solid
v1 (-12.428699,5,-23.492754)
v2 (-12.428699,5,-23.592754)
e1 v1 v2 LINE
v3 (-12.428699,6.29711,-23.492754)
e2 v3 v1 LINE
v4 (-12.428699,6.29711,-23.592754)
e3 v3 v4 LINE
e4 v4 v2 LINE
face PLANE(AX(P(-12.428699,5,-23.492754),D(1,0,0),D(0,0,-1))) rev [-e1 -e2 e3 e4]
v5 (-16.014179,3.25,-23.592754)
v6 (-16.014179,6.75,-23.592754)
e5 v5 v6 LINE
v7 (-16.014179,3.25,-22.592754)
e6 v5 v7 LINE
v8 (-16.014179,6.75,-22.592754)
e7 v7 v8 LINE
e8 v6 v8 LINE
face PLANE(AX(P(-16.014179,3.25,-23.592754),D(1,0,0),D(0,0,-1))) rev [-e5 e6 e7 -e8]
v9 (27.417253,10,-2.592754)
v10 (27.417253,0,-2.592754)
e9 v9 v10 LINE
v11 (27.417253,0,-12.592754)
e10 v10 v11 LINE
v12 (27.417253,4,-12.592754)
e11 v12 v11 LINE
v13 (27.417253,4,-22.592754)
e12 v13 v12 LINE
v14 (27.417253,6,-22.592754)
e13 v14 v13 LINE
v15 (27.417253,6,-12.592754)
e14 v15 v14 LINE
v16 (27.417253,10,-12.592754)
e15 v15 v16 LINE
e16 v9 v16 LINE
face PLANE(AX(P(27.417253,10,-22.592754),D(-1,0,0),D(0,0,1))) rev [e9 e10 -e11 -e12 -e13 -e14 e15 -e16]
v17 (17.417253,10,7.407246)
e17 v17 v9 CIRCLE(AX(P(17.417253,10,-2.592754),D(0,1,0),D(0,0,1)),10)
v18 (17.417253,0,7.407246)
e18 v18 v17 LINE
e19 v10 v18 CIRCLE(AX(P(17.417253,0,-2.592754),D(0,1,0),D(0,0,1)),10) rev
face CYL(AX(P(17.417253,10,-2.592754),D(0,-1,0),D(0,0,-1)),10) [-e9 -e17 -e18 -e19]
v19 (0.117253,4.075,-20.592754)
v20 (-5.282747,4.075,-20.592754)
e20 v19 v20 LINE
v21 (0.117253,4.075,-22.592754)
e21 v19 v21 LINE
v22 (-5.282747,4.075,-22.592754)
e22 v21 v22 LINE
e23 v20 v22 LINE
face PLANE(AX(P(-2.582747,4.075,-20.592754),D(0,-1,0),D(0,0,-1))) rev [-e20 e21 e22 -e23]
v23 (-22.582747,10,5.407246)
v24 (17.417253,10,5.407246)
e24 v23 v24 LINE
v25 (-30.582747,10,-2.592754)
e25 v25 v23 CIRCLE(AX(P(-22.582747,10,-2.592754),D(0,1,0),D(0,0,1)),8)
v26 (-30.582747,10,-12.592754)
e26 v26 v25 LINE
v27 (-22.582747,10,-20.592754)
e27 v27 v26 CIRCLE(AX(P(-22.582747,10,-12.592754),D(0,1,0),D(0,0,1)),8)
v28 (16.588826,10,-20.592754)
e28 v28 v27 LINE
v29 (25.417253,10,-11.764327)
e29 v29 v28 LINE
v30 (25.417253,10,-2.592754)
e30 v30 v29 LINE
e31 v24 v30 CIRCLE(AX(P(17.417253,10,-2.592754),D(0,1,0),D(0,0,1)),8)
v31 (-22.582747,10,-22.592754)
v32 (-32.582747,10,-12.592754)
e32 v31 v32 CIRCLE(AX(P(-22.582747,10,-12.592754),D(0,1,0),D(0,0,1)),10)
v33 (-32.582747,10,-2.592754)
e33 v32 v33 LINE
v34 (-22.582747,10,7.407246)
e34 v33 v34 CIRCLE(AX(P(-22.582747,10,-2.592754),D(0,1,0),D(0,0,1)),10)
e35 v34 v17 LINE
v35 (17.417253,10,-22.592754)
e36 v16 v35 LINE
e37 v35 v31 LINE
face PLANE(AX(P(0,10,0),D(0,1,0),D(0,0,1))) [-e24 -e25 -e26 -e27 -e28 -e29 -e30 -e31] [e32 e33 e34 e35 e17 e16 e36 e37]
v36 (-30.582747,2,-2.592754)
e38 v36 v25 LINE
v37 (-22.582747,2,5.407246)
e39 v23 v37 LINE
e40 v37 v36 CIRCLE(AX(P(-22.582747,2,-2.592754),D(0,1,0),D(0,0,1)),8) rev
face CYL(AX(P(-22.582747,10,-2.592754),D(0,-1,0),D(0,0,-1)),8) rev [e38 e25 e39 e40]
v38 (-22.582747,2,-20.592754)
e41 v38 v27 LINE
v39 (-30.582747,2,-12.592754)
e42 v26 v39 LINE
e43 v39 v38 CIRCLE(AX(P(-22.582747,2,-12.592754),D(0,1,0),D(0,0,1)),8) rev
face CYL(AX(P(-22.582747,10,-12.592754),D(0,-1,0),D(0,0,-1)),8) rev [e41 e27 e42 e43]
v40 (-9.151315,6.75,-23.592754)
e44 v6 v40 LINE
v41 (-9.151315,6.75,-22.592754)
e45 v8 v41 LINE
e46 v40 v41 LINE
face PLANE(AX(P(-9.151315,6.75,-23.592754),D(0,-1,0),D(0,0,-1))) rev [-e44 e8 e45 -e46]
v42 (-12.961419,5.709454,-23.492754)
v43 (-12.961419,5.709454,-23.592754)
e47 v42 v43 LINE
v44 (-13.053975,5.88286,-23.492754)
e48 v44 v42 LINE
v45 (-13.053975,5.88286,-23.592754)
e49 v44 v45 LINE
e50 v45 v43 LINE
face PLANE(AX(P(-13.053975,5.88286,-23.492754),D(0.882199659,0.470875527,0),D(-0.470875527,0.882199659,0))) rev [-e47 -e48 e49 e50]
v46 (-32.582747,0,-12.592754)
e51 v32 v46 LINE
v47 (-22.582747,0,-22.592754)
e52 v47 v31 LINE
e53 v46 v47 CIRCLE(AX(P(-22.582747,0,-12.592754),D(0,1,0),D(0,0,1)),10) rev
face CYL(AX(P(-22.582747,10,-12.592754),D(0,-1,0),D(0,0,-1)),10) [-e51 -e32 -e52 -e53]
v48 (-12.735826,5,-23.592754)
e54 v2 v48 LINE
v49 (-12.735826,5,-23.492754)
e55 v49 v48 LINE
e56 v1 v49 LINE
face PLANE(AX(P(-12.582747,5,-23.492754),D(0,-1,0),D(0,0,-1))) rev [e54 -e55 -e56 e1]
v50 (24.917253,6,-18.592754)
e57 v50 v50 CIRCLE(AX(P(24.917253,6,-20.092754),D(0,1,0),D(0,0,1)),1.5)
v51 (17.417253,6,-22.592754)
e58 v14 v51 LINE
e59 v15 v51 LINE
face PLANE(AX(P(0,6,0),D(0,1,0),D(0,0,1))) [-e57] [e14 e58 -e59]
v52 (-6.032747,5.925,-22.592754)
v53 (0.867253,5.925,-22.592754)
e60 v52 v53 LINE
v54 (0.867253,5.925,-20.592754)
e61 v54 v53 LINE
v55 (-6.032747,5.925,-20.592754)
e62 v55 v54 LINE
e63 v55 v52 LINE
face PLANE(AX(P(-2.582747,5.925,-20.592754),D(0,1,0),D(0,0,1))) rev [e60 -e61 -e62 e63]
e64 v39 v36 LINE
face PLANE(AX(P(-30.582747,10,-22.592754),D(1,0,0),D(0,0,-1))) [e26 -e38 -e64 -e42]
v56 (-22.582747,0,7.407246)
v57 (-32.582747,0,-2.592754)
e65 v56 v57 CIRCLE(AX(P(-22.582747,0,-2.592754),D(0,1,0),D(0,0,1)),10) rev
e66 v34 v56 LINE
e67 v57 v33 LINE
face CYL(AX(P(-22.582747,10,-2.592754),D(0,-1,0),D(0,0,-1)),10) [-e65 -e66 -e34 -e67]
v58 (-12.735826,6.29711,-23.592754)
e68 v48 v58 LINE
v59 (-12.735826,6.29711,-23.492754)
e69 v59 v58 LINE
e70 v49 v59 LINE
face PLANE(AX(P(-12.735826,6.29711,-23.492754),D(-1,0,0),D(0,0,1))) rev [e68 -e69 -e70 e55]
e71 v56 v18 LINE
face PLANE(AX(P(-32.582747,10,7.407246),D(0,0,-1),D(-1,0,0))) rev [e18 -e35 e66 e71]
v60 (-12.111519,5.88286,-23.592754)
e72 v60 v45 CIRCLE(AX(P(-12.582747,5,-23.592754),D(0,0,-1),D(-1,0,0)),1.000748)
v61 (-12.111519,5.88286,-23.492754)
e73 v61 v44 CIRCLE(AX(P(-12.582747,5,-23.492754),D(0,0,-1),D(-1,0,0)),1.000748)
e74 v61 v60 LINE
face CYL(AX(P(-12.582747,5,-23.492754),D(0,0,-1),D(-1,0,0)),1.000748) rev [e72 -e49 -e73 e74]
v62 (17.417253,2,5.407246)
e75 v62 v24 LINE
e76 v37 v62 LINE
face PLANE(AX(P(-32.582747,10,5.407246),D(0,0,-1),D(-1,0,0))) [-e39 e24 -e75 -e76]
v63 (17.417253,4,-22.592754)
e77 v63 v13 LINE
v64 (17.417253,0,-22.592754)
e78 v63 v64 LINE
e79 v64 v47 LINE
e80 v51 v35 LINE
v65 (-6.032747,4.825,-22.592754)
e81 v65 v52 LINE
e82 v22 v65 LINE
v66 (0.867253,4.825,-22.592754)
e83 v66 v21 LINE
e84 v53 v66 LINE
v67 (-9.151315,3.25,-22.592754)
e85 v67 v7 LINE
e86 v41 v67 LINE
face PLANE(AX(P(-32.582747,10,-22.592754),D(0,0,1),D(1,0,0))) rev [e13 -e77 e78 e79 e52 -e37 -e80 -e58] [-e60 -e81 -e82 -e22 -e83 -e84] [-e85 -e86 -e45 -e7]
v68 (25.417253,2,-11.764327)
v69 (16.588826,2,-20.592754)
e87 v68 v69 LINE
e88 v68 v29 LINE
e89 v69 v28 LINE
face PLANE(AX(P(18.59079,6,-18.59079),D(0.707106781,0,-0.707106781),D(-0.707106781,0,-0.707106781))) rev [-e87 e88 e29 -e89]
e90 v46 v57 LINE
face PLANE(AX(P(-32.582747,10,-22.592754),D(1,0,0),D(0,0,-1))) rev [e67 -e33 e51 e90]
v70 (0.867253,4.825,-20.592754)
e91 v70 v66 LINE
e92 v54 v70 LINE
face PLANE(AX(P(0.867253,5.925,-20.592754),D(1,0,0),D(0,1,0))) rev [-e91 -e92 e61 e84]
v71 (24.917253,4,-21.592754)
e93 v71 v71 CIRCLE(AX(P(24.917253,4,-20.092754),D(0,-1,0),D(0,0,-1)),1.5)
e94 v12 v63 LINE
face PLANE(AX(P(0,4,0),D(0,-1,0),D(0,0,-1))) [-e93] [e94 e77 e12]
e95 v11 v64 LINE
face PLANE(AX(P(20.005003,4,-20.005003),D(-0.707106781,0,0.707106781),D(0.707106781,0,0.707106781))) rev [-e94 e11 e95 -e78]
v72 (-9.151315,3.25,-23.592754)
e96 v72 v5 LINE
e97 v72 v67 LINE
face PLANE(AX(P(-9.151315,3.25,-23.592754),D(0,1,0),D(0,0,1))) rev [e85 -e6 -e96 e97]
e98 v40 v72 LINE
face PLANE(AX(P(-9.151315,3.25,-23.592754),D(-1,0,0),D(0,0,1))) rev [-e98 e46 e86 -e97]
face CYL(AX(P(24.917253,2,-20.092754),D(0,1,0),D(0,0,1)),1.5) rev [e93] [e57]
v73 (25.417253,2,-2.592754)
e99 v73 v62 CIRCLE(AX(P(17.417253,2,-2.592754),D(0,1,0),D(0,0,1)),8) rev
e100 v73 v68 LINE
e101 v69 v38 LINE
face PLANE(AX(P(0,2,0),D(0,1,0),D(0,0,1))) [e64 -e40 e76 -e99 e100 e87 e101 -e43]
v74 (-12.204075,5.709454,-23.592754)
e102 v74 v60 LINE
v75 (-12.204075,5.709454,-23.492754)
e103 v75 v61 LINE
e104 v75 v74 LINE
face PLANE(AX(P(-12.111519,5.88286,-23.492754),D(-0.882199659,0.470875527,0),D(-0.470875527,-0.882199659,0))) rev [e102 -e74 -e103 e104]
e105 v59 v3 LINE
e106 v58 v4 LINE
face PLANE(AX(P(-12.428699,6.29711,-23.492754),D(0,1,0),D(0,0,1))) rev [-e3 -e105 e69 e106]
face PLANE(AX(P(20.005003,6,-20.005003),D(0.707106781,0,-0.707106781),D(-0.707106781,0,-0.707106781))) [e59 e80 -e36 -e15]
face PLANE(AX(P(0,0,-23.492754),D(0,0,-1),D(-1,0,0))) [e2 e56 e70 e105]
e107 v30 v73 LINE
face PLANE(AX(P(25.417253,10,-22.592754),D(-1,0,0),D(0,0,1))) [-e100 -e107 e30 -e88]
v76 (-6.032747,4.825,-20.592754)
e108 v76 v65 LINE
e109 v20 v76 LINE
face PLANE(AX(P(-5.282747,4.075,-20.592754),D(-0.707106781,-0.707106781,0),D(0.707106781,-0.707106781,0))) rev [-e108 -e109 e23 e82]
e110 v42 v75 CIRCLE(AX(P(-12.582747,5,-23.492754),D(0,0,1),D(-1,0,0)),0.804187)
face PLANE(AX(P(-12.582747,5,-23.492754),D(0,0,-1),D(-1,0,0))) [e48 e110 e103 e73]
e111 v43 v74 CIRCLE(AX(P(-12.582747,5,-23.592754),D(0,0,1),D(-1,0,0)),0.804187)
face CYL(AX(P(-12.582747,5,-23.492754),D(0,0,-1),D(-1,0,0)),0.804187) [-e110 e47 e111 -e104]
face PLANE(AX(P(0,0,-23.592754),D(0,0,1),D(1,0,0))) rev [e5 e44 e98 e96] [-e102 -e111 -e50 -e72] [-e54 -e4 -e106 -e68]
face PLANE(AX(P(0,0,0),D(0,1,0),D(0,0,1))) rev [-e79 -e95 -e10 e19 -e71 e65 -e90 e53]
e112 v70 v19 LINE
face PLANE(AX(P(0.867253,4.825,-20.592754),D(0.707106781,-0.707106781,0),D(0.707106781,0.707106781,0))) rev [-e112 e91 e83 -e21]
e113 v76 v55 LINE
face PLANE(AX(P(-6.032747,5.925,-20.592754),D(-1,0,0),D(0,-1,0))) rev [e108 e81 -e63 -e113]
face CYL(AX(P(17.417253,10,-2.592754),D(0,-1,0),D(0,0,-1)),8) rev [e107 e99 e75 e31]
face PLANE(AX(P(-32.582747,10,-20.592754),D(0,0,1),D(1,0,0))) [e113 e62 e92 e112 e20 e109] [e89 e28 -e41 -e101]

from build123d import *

# Parameters (mm, degrees)
SKETCH1_W           = 60
SKETCH1_H           = 30
BOSS_EXTRUDE1_DEPTH = 10
FILLET1_R           = 10
FILLET3_R           = 10
FILLET4_R           = 10
CUT_EXTRUDE1_DEPTH  = 4
CUT_EXTRUDE2_DEPTH  = 4
SKETCH8_R           = 1.5
CUT_EXTRUDE3_DEPTH  = 4
SHELL5_START        = 2
SHELL5_DEPTH        = 8
CUT_EXTRUDE4_DEPTH  = 2
SKETCH11_W          = 6.86286456
SKETCH11_H          = 3.5
BOSS_EXTRUDE2_DEPTH = 1
CUT_EXTRUDE5_DEPTH  = 0.1


# Read off the part's stored shape, not the designer's step: Shell5
with BuildPart() as part:
    # Sketch1 → Boss-Extrude1 (new body)
    with BuildSketch(Plane(origin=(0, 0, 0), x_dir=(1, 0, 0), z_dir=(0, 1, 0))):
        with Locations((-2.582747066, 7.592753862)):
            Rectangle(SKETCH1_W, SKETCH1_H)
    extrude(amount=BOSS_EXTRUDE1_DEPTH)

    # Fillet1
    fillet1_edges = [part.edges().sort_by_distance(p)[0] for p in [
        (27.417252934, 5, 7.407246138),
    ]]
    fillet(fillet1_edges, radius=FILLET1_R)

    # Fillet3
    fillet3_edges = [part.edges().sort_by_distance(p)[0] for p in [
        (-32.582747066, 5, 7.407246138),
    ]]
    fillet(fillet3_edges, radius=FILLET3_R)

    # Fillet4
    fillet4_edges = [part.edges().sort_by_distance(p)[0] for p in [
        (-32.582747066, 5, -22.592753862),
    ]]
    fillet(fillet4_edges, radius=FILLET4_R)

    # Sketch6 → Cut-Extrude1 (cut)
    with BuildSketch(Plane(origin=(0, 10, 0), x_dir=(1, 0, 0), z_dir=(0, 1, 0))):
        Polygon((17.417252934, 22.592753862), (27.417252934, 12.592753862), (27.417252934, 22.592753862), align=None)
    extrude(amount=-CUT_EXTRUDE1_DEPTH, mode=Mode.SUBTRACT)

    # Sketch7 → Cut-Extrude2 (cut)
    with BuildSketch(Plane.XZ):
        Polygon((27.417252934, -22.592753862), (27.417252934, -12.592753862), (17.417252934, -22.592753862), align=None)
    extrude(amount=-CUT_EXTRUDE2_DEPTH, mode=Mode.SUBTRACT)

    # Sketch8 → Cut-Extrude3 (cut)
    with BuildSketch(Plane(origin=(0, 6, 0), x_dir=(1, 0, 0), z_dir=(0, 1, 0))):
        with Locations(Location((24.917252934, 20.092753862, 0), (0, 0, 270))):
            Circle(SKETCH8_R)
    extrude(amount=-CUT_EXTRUDE3_DEPTH, mode=Mode.SUBTRACT)

    # Shell5 outline → Shell5 (cut)
    with BuildSketch(Plane(origin=(0, 0, 0), x_dir=(1, 0, 0), z_dir=(0, 1, 0)).offset(SHELL5_START)):
        with BuildLine():
            Line((25.417252934, 2.592753862), (25.417252934, 11.764326737))
            Line((25.417252934, 11.764326737), (16.588825809, 20.592753862))
            Line((16.588825809, 20.592753862), (-22.582747066, 20.592753862))
            ThreePointArc((-22.582747066, 20.592753862), (-28.239601315, 18.249608111), (-30.582747066, 12.592753862))
            Line((-30.582747066, 12.592753862), (-30.582747066, 2.592753862))
            ThreePointArc((-30.582747066, 2.592753862), (-28.239601315, -3.064100388), (-22.582747066, -5.407246138))
            Line((-22.582747066, -5.407246138), (17.417252934, -5.407246138))
            ThreePointArc((17.417252934, -5.407246138), (23.074107184, -3.064100387), (25.417252934, 2.592753862))
        make_face()
    extrude(amount=SHELL5_DEPTH, mode=Mode.SUBTRACT)

    # Sketch10 → Cut-Extrude4 (cut)
    with BuildSketch(Plane(origin=(0, 0, -22.592753862), x_dir=(-1, 0, 0), z_dir=(0, 0, -1))):
        Polygon((2.582747066, 5.925), (6.032747066, 5.925), (6.032747066, 4.825), (5.282747066, 4.075), (2.582747066, 4.075), (-0.117252934, 4.075), (-0.867252934, 4.825), (-0.867252934, 5.925), align=None)
    extrude(amount=-CUT_EXTRUDE4_DEPTH, mode=Mode.SUBTRACT)

    # Sketch11 → Boss-Extrude2 (add)
    with BuildSketch(Plane(origin=(0, 0, -22.592753862), x_dir=(-1, 0, 0), z_dir=(0, 0, -1))):
        with Locations((12.582747066, 5)):
            Rectangle(SKETCH11_W, SKETCH11_H)
    extrude(amount=BOSS_EXTRUDE2_DEPTH)

    # Sketch12 → Cut-Extrude5 (cut)
    with BuildSketch(Plane(origin=(0, 0, -23.592753862), x_dir=(-1, 0, 0), z_dir=(0, 0, -1))):
        Polygon((12.582747066, 5), (12.735825542, 5), (12.735825542, 6.297110067), (12.428698836, 6.297110067), (12.428698836, 5), align=None)
        with BuildLine():
            Line((12.111519237, 5.882859707), (12.204075045, 5.709453579))
            ThreePointArc((12.204075045, 5.709453579), (12.582747066, 4.195812907), (12.961419087, 5.709453579))
            Line((12.961419087, 5.709453579), (13.053974895, 5.882859707))
            ThreePointArc((13.053974895, 5.882859707), (12.582747066, 3.999251816), (12.111519237, 5.882859707))
        make_face()
    extrude(amount=-CUT_EXTRUDE5_DEPTH, mode=Mode.SUBTRACT)


solid = part.part
